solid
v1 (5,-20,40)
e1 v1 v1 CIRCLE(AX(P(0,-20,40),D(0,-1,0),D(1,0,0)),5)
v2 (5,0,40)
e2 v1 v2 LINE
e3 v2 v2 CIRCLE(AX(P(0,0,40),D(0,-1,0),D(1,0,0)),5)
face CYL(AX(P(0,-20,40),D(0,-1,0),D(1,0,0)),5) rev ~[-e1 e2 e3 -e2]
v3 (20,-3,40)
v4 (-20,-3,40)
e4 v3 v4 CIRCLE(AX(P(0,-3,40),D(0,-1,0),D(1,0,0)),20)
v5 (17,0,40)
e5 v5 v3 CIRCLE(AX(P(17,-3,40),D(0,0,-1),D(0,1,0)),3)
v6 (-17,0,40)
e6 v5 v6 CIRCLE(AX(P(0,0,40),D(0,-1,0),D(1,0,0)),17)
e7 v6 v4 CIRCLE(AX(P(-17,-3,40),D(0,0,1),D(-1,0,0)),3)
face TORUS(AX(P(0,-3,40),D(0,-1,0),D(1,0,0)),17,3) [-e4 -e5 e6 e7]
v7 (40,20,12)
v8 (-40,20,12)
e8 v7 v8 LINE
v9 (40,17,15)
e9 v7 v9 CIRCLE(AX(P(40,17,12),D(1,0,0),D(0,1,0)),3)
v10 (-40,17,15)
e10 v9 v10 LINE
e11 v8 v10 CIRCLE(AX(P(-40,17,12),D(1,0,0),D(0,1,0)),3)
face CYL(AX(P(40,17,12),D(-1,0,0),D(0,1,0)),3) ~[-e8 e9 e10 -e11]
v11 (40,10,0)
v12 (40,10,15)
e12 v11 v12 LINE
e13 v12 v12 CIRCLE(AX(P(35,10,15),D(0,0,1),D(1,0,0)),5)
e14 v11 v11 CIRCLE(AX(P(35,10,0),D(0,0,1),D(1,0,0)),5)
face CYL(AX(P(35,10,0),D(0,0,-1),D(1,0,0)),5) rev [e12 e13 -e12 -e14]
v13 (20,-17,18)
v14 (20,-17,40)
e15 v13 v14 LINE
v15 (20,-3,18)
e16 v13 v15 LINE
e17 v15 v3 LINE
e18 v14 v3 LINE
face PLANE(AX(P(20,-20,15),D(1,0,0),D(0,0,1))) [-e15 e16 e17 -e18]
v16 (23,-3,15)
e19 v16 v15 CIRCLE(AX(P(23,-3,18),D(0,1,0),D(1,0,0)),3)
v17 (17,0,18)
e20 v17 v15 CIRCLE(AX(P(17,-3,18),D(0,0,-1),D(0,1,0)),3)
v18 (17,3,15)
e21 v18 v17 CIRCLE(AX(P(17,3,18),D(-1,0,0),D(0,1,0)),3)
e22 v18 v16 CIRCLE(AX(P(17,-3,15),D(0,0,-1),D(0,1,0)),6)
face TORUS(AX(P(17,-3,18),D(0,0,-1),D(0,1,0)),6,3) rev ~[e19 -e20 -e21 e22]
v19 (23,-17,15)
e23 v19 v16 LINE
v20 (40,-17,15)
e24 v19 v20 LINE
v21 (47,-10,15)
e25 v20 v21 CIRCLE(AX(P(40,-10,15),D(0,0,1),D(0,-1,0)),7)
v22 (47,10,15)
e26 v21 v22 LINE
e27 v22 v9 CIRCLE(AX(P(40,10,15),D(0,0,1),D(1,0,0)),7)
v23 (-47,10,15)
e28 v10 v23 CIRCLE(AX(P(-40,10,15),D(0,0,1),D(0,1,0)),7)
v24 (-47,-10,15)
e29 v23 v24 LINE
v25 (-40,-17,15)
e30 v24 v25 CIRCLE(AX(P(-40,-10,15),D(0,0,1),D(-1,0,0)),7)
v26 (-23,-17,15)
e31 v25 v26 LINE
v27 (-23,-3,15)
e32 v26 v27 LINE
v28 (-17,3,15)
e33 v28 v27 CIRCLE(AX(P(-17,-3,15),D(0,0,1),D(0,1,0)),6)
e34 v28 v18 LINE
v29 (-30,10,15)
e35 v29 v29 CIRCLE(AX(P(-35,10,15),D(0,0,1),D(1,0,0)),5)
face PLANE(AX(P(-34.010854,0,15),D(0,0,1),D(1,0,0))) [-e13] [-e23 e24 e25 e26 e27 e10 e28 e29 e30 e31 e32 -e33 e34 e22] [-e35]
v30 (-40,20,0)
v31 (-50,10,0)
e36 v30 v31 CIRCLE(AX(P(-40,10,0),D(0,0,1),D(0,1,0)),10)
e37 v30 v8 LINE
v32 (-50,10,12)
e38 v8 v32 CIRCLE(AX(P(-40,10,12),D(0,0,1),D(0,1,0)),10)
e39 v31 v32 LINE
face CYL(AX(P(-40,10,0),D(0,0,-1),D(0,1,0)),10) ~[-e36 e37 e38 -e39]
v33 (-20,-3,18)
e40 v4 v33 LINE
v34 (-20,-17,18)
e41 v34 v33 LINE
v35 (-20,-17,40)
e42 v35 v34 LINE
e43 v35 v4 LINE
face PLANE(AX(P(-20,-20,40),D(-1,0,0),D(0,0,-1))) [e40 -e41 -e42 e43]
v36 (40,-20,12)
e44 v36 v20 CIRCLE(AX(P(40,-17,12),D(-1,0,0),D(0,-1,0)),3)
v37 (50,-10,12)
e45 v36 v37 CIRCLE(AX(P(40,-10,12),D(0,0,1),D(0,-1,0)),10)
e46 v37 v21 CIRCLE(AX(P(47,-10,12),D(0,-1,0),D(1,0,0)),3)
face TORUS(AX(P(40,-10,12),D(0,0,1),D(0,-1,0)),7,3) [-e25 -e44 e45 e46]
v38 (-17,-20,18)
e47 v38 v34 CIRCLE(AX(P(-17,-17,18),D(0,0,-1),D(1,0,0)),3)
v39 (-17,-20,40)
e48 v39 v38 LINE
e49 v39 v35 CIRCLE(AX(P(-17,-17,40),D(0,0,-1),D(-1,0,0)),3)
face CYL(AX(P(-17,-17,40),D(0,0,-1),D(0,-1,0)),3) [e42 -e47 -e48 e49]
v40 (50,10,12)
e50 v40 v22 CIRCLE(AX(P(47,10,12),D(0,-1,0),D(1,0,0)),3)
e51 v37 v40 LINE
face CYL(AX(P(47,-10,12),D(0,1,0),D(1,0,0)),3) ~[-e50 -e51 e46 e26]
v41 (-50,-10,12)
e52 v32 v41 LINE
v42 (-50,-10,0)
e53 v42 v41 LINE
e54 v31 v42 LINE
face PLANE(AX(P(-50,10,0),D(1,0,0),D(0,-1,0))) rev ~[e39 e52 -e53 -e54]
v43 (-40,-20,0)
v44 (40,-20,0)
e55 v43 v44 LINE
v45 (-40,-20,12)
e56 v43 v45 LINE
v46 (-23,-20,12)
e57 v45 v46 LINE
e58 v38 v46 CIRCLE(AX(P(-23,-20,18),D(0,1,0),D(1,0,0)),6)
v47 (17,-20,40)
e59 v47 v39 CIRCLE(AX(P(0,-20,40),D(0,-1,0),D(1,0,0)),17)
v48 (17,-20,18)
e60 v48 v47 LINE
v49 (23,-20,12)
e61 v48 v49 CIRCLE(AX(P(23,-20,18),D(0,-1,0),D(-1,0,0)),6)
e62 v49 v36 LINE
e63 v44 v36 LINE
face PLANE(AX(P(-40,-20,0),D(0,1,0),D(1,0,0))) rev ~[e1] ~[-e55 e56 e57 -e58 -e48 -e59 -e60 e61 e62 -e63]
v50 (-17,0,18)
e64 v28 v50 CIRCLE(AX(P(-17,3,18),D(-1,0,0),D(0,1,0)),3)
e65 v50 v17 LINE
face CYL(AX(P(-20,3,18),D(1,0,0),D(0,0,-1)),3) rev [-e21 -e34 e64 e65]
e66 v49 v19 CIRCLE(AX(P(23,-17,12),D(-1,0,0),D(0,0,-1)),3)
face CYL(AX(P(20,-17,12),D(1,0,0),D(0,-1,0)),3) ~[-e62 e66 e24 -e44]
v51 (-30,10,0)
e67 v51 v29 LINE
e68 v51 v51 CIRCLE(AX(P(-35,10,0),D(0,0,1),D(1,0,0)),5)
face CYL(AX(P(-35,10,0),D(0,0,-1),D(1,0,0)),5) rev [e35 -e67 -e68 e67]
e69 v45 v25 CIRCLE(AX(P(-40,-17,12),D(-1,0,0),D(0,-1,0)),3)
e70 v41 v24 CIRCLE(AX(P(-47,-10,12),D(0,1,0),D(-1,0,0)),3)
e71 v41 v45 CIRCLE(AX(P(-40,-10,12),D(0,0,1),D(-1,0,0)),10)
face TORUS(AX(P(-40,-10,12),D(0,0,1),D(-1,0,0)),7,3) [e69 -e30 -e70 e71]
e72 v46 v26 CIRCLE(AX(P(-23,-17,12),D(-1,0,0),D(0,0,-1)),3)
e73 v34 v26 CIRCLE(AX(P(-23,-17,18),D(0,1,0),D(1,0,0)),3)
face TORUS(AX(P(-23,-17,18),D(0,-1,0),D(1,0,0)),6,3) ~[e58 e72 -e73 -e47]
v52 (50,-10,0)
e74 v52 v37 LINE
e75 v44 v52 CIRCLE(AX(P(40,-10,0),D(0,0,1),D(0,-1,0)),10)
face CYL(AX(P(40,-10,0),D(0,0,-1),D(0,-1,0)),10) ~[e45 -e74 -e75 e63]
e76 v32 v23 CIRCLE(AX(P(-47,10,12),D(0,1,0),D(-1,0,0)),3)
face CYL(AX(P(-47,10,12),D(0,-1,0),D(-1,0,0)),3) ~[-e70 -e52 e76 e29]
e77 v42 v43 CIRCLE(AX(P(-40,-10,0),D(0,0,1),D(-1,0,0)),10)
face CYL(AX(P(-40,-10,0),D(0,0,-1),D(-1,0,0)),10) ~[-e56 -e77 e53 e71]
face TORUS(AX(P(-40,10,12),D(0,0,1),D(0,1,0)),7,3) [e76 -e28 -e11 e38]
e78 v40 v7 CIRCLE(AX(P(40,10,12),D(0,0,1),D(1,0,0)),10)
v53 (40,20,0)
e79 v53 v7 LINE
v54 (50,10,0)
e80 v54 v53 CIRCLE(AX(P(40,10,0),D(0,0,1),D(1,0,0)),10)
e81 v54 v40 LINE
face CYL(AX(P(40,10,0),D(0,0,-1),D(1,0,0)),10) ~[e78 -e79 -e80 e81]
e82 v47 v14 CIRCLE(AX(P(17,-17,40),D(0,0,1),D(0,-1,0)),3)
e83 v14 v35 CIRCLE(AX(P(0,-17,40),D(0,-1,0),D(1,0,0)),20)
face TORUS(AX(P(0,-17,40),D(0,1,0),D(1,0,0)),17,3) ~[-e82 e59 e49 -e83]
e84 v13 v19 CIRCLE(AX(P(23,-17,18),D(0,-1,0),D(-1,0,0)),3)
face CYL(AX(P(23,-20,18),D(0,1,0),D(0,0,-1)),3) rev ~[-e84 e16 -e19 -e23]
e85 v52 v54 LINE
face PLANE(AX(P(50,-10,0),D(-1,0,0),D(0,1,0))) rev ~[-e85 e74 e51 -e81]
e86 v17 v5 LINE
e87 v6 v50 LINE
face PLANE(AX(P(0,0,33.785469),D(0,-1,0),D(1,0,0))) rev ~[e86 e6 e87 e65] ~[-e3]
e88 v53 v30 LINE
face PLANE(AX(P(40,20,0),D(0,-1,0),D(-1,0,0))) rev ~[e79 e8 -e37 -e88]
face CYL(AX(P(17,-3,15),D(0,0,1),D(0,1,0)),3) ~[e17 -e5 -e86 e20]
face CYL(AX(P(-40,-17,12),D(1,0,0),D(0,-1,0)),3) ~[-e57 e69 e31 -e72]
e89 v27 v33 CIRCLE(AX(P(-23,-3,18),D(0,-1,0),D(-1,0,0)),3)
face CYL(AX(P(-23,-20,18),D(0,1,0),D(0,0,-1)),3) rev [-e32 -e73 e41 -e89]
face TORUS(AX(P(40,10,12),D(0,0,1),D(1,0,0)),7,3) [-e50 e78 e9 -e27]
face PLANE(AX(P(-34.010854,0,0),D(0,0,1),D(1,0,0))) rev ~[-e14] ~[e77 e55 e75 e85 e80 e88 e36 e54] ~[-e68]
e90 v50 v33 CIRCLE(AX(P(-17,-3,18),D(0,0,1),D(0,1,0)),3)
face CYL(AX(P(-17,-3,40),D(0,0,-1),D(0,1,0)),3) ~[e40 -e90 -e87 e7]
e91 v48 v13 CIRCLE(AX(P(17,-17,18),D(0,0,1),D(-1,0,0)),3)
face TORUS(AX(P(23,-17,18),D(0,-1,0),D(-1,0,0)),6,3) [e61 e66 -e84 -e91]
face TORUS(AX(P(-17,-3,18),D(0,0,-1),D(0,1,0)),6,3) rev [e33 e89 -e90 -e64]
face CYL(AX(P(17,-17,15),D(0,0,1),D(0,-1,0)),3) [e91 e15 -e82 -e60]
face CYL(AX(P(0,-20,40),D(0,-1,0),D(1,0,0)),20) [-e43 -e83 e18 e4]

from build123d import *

# Parameters (mm, degrees)
F0_R     = 5
F0_W     = 40
F0_H     = 40
F1_DEPTH = 15
F2_R     = 5
F3_DEPTH = 20
F4_R     = 3


with BuildPart() as f1:
    # F0 (on Top) → F1 (new body)
    with BuildSketch(Plane.XY):
        with BuildLine():
            Line((-40, -20), (-20.3233100474, -20))
            Line((-20.3233100474, -20), (-20.3233100474, 20))
            Line((-20.3233100474, 20), (-40, 20))
            ThreePointArc((-40, 20), (-47.0710678119, 17.0710678119), (-50, 10))
            Line((-50, 10), (-50, -10))
            ThreePointArc((-50, -10), (-47.0710678119, -17.0710678119), (-40, -20))
        make_face()
        with Locations((-35, 10)):
            Circle(F0_R, mode=Mode.SUBTRACT)
        with Locations((-0.3233100474, 0)):
            Rectangle(F0_W, F0_H)
        with BuildLine():
            Line((19.6766899526, -20), (40, -20))
            ThreePointArc((40, -20), (47.0710678119, -17.0710678119), (50, -10))
            Line((50, -10), (50, 10))
            ThreePointArc((50, 10), (47.0710678119, 17.0710678119), (40, 20))
            Line((40, 20), (19.6766899526, 20))
            Line((19.6766899526, 20), (19.6766899526, -20))
        make_face()
        with Locations((35, 10)):
            Circle(F0_R, mode=Mode.SUBTRACT)
    extrude(amount=F1_DEPTH)

    # F2 (on face) → F3 (join)
    with BuildSketch(Plane.XZ.offset(20)):
        with BuildLine():
            ThreePointArc((20, 40), (0, 60), (-20, 40))
            Line((-20, 40), (-20, 15))
            Line((-20, 15), (20, 15))
            Line((20, 15), (20, 40))
        make_face()
        with Locations((0, 40)):
            Circle(F2_R, mode=Mode.SUBTRACT)
    extrude(amount=-F3_DEPTH)

    # F4
    f4_edges = [f1.edges().sort_by_distance(p)[0] for p in [
        (0, 0, 60),
        (0, 0, 15),
        (0, -20, 60),
        (-30, -20, 15),
        (-20, -20, 27.5),
        (20, -20, 27.5),
        (30, -20, 15),
        (-47.071068, -17.071068, 15),
        (47.071068, -17.071068, 15),
        (-50, 0, 15),
        (-47.071068, 17.071068, 15),
        (0, 20, 15),
        (47.071068, 17.071068, 15),
        (50, 0, 15),
        (20, -10, 15),
        (-20, -10, 15),
        (20, 0, 27.5),
        (-20, 0, 27.5),
    ]]
    fillet(f4_edges, radius=F4_R)


solid = f1.part
